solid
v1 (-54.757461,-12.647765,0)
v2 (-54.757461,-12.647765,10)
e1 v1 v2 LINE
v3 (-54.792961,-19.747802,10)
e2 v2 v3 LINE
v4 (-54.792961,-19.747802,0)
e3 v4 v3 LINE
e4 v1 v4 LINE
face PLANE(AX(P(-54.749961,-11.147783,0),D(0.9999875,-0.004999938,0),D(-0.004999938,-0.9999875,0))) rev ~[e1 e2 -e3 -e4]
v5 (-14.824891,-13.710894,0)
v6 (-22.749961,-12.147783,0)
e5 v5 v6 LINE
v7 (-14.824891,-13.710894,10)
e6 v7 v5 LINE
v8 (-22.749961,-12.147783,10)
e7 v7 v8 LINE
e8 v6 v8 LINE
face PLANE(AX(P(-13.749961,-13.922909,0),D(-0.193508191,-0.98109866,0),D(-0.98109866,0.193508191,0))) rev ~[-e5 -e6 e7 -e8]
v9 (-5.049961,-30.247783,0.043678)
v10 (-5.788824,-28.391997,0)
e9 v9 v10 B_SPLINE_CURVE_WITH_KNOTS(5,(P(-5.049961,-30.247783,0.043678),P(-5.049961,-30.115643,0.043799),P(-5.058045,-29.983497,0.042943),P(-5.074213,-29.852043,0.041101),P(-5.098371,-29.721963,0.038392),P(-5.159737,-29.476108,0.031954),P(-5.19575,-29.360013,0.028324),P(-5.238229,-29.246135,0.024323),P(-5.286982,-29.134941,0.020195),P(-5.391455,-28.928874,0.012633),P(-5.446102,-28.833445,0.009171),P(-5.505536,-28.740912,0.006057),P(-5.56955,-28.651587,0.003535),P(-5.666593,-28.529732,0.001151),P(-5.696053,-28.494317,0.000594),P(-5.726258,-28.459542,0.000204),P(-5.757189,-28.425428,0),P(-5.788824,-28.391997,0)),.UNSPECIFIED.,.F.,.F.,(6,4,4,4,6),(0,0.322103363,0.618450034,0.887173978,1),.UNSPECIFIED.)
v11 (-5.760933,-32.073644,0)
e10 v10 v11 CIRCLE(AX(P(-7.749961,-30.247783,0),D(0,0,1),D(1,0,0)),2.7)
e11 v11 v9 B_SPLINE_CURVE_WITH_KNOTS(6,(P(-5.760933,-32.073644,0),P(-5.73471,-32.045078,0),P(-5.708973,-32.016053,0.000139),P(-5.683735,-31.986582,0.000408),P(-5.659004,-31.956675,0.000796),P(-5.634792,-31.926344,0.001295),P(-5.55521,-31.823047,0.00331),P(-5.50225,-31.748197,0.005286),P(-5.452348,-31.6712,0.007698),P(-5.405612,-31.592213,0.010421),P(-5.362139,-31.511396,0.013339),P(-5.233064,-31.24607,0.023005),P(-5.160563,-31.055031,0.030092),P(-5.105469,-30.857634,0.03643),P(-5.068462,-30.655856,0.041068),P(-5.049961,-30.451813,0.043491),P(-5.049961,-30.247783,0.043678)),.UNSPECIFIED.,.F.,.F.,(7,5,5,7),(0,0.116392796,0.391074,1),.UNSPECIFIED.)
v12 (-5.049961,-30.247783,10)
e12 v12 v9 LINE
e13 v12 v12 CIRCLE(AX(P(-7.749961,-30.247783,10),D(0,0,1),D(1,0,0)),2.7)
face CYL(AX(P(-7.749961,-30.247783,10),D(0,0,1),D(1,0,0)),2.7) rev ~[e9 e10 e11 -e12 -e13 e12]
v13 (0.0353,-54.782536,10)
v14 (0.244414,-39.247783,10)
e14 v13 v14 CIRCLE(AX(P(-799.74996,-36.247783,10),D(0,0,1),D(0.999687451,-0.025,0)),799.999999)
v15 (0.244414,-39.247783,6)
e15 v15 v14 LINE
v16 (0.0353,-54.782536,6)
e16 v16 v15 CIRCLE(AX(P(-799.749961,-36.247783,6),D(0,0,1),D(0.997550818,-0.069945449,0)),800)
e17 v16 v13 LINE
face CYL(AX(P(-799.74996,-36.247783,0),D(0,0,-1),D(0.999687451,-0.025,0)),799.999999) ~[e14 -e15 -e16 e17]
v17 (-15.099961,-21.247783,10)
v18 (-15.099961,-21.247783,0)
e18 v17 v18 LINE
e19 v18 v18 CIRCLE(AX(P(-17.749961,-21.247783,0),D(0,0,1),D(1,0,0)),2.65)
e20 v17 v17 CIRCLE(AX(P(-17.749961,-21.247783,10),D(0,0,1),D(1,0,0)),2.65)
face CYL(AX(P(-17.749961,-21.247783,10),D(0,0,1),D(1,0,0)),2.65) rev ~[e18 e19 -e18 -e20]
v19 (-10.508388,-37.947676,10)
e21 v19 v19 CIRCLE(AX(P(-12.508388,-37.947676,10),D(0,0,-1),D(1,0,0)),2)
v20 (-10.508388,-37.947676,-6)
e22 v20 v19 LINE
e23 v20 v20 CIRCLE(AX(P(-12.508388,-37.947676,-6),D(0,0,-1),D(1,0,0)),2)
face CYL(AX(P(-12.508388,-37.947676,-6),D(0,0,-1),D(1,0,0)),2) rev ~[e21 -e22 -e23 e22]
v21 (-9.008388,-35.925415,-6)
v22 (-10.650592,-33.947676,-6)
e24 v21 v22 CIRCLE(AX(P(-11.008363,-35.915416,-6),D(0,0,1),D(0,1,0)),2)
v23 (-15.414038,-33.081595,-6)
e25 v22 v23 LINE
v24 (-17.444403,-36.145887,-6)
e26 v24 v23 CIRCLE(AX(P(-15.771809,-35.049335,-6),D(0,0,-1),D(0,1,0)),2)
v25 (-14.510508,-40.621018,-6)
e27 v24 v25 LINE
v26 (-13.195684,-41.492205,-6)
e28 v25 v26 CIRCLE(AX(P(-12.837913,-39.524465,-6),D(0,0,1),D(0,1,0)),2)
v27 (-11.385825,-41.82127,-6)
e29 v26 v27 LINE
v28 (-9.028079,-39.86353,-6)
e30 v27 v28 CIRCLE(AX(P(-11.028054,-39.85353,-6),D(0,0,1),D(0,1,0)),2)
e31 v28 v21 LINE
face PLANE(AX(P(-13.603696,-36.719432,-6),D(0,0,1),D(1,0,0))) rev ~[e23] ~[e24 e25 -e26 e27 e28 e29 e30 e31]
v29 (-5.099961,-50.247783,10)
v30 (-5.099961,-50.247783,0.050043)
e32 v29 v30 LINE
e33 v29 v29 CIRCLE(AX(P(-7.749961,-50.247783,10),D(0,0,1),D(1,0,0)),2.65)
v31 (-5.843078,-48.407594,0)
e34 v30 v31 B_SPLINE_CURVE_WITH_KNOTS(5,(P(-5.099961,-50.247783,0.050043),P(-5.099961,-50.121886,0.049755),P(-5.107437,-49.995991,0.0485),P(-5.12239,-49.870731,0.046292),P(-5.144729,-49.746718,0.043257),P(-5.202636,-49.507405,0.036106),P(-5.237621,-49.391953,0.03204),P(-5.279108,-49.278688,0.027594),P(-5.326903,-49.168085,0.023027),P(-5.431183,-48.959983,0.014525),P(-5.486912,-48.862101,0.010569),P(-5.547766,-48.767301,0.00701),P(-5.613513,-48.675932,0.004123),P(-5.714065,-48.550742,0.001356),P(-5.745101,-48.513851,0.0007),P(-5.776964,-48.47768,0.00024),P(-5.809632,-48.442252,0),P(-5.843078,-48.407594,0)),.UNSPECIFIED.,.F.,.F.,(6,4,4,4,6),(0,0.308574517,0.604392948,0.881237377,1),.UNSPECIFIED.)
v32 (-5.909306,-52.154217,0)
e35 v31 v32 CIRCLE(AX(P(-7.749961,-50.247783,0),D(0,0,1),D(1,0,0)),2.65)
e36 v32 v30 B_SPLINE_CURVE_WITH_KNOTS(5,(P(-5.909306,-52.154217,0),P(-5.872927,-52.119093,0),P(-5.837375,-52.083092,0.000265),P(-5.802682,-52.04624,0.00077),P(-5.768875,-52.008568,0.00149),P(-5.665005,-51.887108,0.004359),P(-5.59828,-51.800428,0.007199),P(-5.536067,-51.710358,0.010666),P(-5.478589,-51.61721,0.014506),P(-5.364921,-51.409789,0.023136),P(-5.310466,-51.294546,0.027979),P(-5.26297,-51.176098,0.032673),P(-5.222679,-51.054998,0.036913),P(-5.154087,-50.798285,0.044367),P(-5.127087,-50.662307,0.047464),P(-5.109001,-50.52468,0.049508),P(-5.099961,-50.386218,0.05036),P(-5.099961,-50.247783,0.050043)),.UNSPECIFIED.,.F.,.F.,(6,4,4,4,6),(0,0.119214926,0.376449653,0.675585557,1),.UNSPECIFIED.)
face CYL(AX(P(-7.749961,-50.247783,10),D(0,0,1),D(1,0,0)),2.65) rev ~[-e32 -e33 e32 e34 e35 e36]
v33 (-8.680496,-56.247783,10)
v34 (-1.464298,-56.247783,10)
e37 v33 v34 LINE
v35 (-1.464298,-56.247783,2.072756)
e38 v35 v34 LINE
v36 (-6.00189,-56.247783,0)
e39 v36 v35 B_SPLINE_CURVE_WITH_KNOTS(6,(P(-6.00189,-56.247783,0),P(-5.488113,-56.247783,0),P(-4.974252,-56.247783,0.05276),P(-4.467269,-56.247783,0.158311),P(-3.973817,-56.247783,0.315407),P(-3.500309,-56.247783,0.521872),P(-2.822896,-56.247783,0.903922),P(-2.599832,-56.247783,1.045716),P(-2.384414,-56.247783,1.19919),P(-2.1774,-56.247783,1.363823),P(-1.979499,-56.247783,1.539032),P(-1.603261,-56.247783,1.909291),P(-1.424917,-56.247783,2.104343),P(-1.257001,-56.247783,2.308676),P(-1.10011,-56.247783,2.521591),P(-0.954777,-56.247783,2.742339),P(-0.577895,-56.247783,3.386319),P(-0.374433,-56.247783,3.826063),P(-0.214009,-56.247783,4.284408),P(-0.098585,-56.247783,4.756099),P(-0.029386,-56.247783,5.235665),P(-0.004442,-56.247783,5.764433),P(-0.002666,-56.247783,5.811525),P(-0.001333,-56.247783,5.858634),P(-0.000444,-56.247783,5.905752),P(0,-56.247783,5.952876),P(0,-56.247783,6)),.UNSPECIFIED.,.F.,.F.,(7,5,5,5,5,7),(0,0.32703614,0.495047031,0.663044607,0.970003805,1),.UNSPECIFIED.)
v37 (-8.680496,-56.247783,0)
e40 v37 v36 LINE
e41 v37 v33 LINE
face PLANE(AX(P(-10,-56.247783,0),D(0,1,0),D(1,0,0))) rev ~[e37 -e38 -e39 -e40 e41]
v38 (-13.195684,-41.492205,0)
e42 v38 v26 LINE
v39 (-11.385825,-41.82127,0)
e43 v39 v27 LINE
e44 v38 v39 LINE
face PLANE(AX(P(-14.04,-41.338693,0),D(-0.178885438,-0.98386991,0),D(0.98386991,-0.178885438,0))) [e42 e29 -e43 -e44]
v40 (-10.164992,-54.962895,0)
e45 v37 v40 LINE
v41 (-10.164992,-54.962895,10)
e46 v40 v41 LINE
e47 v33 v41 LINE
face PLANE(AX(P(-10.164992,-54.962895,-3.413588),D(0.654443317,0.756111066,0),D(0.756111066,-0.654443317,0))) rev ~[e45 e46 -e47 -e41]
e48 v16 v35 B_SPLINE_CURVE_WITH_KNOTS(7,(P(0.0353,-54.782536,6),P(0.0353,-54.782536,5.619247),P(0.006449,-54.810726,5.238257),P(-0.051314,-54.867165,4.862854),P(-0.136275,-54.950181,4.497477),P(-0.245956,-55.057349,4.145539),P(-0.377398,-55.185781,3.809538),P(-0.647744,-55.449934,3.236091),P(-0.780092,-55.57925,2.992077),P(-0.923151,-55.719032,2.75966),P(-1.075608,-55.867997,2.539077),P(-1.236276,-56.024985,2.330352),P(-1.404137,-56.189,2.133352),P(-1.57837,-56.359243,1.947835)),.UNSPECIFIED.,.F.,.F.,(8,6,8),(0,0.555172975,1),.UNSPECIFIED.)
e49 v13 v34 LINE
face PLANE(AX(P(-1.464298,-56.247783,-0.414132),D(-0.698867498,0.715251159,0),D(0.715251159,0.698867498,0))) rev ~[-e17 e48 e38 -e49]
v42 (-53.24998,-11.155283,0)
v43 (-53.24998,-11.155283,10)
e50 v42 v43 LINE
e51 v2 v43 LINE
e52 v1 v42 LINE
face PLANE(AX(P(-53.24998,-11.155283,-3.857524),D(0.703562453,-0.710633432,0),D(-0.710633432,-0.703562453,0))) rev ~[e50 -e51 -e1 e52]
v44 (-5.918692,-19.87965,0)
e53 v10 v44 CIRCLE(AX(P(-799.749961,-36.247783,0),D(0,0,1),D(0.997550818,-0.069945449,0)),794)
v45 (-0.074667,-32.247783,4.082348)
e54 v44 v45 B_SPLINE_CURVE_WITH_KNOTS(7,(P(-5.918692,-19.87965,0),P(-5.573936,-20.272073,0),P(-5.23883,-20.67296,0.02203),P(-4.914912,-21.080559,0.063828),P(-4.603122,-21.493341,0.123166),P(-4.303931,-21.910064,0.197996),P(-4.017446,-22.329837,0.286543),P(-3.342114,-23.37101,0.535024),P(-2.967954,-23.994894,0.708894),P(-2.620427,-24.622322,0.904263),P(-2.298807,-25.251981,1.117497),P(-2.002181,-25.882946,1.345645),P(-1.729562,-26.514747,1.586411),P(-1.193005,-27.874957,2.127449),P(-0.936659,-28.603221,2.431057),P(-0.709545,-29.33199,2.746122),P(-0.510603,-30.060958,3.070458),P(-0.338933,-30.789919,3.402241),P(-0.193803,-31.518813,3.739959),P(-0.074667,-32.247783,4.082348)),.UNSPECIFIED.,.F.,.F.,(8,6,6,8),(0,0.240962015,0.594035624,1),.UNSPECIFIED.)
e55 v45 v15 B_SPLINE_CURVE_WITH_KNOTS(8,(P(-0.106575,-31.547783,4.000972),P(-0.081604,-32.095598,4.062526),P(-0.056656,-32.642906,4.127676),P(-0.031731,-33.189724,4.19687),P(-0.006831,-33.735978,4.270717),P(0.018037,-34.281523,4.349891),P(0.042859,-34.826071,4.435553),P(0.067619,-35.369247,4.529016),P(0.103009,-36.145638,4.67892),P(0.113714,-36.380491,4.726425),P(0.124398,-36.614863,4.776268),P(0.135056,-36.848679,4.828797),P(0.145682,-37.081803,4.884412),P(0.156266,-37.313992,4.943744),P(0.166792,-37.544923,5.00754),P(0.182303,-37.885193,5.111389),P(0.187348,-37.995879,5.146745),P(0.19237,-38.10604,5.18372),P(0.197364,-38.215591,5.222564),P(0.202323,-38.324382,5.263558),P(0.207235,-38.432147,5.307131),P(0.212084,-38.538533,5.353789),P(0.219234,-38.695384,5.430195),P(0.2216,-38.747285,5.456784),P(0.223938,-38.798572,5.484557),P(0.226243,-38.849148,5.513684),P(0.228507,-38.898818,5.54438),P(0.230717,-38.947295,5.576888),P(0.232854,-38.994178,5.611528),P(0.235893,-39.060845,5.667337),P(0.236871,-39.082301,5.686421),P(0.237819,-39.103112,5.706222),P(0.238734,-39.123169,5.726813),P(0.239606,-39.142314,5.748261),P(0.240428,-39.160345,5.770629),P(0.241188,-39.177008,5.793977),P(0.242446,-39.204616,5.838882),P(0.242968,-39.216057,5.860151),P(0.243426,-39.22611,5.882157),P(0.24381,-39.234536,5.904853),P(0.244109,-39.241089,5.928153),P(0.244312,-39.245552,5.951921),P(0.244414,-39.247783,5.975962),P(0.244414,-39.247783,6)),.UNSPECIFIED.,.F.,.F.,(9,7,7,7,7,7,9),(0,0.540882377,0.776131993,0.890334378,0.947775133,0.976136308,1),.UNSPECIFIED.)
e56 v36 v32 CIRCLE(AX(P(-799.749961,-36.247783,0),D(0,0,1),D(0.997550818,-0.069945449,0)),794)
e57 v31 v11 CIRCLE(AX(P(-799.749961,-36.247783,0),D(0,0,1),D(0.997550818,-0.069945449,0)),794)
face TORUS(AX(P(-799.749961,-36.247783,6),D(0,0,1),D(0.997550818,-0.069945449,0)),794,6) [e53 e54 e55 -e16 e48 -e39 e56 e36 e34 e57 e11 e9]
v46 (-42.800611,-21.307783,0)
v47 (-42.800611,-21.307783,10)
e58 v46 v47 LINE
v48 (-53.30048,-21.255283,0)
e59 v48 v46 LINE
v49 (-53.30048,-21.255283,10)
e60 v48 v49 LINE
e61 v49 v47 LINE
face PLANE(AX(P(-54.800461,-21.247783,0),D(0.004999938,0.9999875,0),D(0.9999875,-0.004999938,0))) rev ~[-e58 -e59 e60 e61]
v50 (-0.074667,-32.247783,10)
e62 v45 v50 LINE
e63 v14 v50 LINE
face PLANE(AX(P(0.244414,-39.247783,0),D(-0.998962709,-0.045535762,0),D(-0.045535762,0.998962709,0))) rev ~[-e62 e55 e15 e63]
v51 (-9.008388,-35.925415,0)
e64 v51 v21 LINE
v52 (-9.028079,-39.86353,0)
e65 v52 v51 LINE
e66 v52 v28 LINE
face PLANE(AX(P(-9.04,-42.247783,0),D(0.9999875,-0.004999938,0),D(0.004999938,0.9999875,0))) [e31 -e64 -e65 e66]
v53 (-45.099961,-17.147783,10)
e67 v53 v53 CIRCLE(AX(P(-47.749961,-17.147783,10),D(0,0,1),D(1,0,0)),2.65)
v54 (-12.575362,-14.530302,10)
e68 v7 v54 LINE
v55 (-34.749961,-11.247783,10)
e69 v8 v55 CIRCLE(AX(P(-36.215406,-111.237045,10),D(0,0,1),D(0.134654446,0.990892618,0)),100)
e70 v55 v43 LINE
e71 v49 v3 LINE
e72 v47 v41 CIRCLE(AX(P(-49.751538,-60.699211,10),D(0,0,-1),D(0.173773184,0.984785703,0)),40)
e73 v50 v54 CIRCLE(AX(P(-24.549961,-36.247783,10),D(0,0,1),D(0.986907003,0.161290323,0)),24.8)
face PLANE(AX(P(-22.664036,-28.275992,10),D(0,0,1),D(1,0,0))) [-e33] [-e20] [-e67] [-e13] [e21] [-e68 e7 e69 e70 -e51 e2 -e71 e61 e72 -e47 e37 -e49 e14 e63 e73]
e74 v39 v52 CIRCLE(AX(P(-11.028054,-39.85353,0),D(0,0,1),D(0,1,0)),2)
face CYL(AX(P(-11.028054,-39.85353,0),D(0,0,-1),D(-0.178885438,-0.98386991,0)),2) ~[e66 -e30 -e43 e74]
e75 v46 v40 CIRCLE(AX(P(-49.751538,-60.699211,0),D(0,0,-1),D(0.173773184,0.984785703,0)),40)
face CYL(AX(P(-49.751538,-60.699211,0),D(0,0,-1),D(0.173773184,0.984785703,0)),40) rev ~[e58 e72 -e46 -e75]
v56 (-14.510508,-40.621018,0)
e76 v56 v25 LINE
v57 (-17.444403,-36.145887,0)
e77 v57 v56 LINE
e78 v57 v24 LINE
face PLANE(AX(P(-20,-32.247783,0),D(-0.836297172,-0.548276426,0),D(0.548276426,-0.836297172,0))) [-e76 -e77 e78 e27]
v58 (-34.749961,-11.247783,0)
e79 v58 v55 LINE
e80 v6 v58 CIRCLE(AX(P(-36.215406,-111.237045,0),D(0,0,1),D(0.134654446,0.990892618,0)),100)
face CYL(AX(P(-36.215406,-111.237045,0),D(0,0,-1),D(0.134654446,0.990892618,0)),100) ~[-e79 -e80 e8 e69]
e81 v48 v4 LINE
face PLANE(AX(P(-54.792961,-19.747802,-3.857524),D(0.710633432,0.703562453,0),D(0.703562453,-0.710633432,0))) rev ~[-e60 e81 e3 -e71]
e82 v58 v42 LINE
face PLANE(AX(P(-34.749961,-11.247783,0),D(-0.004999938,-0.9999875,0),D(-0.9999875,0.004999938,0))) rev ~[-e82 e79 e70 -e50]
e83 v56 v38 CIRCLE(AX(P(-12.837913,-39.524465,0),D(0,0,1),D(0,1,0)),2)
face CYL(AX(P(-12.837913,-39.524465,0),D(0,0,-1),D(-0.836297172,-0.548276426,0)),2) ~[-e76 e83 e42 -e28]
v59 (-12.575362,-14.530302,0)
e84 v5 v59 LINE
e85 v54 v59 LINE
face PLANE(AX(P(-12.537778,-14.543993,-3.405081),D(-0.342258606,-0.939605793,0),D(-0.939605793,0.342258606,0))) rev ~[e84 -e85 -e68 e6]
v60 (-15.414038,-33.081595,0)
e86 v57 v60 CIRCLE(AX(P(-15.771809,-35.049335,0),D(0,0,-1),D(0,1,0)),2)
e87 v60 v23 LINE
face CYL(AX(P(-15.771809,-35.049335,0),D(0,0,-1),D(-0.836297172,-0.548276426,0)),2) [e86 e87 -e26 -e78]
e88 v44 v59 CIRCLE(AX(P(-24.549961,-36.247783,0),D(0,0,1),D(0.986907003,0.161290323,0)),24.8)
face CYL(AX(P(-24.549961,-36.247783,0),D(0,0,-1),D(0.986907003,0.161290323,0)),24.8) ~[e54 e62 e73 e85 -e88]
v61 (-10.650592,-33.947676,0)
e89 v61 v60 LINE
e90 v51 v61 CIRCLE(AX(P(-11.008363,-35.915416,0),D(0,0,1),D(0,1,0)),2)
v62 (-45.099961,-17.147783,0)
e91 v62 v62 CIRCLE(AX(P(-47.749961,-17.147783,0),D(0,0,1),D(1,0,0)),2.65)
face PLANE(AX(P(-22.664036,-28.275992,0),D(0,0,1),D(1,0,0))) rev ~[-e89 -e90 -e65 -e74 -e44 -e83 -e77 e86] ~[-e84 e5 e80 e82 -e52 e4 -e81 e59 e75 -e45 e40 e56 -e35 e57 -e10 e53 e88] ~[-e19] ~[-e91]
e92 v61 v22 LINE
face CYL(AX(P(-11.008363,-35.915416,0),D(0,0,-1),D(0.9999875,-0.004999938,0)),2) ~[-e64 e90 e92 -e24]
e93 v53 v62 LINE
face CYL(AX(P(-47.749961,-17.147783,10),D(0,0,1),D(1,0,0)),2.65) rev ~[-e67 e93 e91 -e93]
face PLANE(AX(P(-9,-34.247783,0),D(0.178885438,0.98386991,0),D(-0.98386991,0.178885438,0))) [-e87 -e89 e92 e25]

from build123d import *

# Parameters (mm, degrees)
F1_DEPTH    = 10
F2_R        = 2.65
F2_R_2      = 2.7
F3_DEPTH    = 10.001
F4_T2_ANGLE = 6.3743045961
F6_DEPTH    = 6
F7_R        = 2
F8_T1_DEPTH = 17.7150489639
F8_T3_DEPTH = 16.827176909
F8_T5_DEPTH = 14.1871505468
F9_T1_DEPTH = 16.8101610382
F10_R       = 2
F11_DEPTH   = 16


# Not quite as in the source:
# - a fillet or chamfer that OpenCascade refuses, or shapes differently, is made with other operations: its cross-section is extruded or revolved along the edge and cut away or added
# - a feature names something its author has since deleted; it is built from what else it names


with BuildPart() as f1:
    # F0 (on Top) → F1 (new body)
    with BuildSketch(Plane.XY):
        with BuildLine():
            Line((-34.7499609253, -11.2477834763), (-54.7499609253, -11.1477834763))
            Line((-54.7499609253, -11.1477834763), (-54.8004609253, -21.2477834763))
            Line((-54.8004609253, -21.2477834763), (-42.8006109225, -21.3077827264))
            ThreePointArc((-42.8006109225, -21.3077827264), (-20.5885311059, -33.3218659489), (-10, -56.2477834763))
            Line((-10, -56.2477834763), (0, -56.2477834763))
            ThreePointArc((0, -56.2477834763), (0.1673692192, -47.7484327866), (0.2444140549, -39.2477834763))
            Line((0.2444140549, -39.2477834763), (-0.07466726, -32.2477834763))
            ThreePointArc((-0.07466726, -32.2477834763), (-4.6744272783, -21.4152799032), (-13.7499609253, -13.9229094565))
            Line((-13.7499609253, -13.9229094565), (-22.7499609253, -12.1477834763))
            ThreePointArc((-22.7499609253, -12.1477834763), (-28.7364107349, -11.5171142711), (-34.7499609253, -11.2477834763))
        make_face()
    extrude(amount=F1_DEPTH)

    # F2 (on face) → F3 (cut, through all)
    with BuildSketch(Plane.XY.offset(10)):
        with Locations((-47.7499609253, -17.1477834763)):
            Circle(F2_R)
        with Locations((-17.7499609253, -21.2477834763)):
            Circle(F2_R)
        with Locations((-7.7499609253, -50.2477834763)):
            Circle(F2_R)
        with Locations((-7.7499609253, -30.2477834763)):
            Circle(F2_R_2)
    extrude(amount=-F3_DEPTH, mode=Mode.SUBTRACT)

    # F4: fillet of radius 6 on 1 edges, made by hand

    # F4_s1 → F4_t2 (revolve, cut)
    with BuildSketch(Plane(origin=(-6.441827323, -91.8723118046, 0), x_dir=(0, 0, 1), z_dir=(-0.0699454492, -0.9975508178, 0))):
        with BuildLine():
            ThreePointArc((0, 1.2558600799), (1.7573593129, -2.9867806073), (6, -4.7441399201))
            Line((6, -4.7441399201), (6, -4.8641399201))
            Line((6, -4.8641399201), (-0.12, -4.8641399201))
            Line((-0.12, -4.8641399201), (-0.12, 1.2558600799))
            Line((-0.12, 1.2558600799), (0, 1.2558600799))
        make_face()
    revolve(axis=Axis((-799.7499609255, -36.2477834763, 0), (0, 0, 1)), revolution_arc=F4_T2_ANGLE, mode=Mode.SUBTRACT)

    # F5 (on face) → F6 (join)
    with BuildSketch(Plane.XY):
        Polygon((-20, -32.2477834763), (-14.04, -41.3386925673), (-9.04, -42.2477834763), (-9, -34.2477834763), align=None)
    extrude(amount=-F6_DEPTH)

    # F7
    f7_edges = [f1.edges().sort_by_distance(p)[0] for p in [
        (-9, -34.247783, -3),
        (-20, -32.247783, -3),
        (-14.04, -41.338693, -3),
        (-9.04, -42.247783, -3),
    ]]
    fillet(f7_edges, radius=F7_R)

    # F8: chamfer of 1.5 on 4 edges, made by hand

    # F8_s2 → F8_t1 (cut)
    with BuildSketch(Plane.XY.offset(-3.8575244819)):
        Polygon((-53.2499796749, -11.1552833826), (-54.7574608315, -12.6477647267), (-54.7499609253, -11.1477834763), align=None)
        Polygon((-54.792961019, -19.747802226), (-53.3004796749, -21.2552833826), (-54.8004609253, -21.2477834763), align=None)
    extrude(amount=F8_T1_DEPTH, mode=Mode.SUBTRACT)

    # F8_s4 → F8_t3 (cut)
    with BuildSketch(Plane.XY.offset(-3.4135884545)):
        with BuildLine():
            Line((-10.1649915082, -54.9628953089), (-8.6804960049, -56.2477834763))
            Line((-8.6804960049, -56.2477834763), (-10, -56.2477834763))
            ThreePointArc((-10, -56.2477834763), (-10.0801500361, -55.5824778984), (-10.1649915082, -54.9628953089))
        make_face()
    extrude(amount=F8_T3_DEPTH, mode=Mode.SUBTRACT)

    # F8_s6 → F8_t5 (cut)
    with BuildSketch(Plane.XY.offset(-0.4141318258)):
        with BuildLine():
            Line((-1.4642977695, -56.2477834763), (0.0352995939, -54.7825361376))
            ThreePointArc((0.0352995939, -54.7825361376), (0.0185023043, -55.4936979353), (0, -56.2477834763))
            Line((0, -56.2477834763), (-1.4642977695, -56.2477834763))
        make_face()
    extrude(amount=F8_T5_DEPTH, mode=Mode.SUBTRACT)

    # F9: chamfer of 1 on 1 edges, made by hand

    # F9_s2 → F9_t1 (cut)
    with BuildSketch(Plane.XY.offset(-3.4050805191)):
        with BuildLine():
            Line((-12.5377780347, -14.5439926831), (-14.8624749797, -13.6972040173))
            Line((-14.8624749797, -13.6972040173), (-14.8586048158, -13.6775820441))
            ThreePointArc((-14.8586048158, -13.6775820441), (-14.3029436702, -13.7934559205), (-13.7460907615, -13.9032874834))
            Line((-13.7460907615, -13.9032874834), (-13.7412512479, -13.9049055259))
            ThreePointArc((-13.7412512479, -13.9049055259), (-13.1317908034, -14.2101386142), (-12.5281211003, -14.5264785854))
            Line((-12.5281211003, -14.5264785854), (-12.5377780347, -14.5439926831))
        make_face()
    extrude(amount=F9_T1_DEPTH, mode=Mode.SUBTRACT)

    # F10 (on face) → F11 (cut, through all)
    with BuildSketch(Plane(origin=(0, 0, -6), x_dir=(1, 0, 0), z_dir=(0, 0, -1))):
        with Locations((-12.50838816, 37.9476757883)):
            Circle(F10_R)
    extrude(amount=-F11_DEPTH, mode=Mode.SUBTRACT)


solid = f1.part
